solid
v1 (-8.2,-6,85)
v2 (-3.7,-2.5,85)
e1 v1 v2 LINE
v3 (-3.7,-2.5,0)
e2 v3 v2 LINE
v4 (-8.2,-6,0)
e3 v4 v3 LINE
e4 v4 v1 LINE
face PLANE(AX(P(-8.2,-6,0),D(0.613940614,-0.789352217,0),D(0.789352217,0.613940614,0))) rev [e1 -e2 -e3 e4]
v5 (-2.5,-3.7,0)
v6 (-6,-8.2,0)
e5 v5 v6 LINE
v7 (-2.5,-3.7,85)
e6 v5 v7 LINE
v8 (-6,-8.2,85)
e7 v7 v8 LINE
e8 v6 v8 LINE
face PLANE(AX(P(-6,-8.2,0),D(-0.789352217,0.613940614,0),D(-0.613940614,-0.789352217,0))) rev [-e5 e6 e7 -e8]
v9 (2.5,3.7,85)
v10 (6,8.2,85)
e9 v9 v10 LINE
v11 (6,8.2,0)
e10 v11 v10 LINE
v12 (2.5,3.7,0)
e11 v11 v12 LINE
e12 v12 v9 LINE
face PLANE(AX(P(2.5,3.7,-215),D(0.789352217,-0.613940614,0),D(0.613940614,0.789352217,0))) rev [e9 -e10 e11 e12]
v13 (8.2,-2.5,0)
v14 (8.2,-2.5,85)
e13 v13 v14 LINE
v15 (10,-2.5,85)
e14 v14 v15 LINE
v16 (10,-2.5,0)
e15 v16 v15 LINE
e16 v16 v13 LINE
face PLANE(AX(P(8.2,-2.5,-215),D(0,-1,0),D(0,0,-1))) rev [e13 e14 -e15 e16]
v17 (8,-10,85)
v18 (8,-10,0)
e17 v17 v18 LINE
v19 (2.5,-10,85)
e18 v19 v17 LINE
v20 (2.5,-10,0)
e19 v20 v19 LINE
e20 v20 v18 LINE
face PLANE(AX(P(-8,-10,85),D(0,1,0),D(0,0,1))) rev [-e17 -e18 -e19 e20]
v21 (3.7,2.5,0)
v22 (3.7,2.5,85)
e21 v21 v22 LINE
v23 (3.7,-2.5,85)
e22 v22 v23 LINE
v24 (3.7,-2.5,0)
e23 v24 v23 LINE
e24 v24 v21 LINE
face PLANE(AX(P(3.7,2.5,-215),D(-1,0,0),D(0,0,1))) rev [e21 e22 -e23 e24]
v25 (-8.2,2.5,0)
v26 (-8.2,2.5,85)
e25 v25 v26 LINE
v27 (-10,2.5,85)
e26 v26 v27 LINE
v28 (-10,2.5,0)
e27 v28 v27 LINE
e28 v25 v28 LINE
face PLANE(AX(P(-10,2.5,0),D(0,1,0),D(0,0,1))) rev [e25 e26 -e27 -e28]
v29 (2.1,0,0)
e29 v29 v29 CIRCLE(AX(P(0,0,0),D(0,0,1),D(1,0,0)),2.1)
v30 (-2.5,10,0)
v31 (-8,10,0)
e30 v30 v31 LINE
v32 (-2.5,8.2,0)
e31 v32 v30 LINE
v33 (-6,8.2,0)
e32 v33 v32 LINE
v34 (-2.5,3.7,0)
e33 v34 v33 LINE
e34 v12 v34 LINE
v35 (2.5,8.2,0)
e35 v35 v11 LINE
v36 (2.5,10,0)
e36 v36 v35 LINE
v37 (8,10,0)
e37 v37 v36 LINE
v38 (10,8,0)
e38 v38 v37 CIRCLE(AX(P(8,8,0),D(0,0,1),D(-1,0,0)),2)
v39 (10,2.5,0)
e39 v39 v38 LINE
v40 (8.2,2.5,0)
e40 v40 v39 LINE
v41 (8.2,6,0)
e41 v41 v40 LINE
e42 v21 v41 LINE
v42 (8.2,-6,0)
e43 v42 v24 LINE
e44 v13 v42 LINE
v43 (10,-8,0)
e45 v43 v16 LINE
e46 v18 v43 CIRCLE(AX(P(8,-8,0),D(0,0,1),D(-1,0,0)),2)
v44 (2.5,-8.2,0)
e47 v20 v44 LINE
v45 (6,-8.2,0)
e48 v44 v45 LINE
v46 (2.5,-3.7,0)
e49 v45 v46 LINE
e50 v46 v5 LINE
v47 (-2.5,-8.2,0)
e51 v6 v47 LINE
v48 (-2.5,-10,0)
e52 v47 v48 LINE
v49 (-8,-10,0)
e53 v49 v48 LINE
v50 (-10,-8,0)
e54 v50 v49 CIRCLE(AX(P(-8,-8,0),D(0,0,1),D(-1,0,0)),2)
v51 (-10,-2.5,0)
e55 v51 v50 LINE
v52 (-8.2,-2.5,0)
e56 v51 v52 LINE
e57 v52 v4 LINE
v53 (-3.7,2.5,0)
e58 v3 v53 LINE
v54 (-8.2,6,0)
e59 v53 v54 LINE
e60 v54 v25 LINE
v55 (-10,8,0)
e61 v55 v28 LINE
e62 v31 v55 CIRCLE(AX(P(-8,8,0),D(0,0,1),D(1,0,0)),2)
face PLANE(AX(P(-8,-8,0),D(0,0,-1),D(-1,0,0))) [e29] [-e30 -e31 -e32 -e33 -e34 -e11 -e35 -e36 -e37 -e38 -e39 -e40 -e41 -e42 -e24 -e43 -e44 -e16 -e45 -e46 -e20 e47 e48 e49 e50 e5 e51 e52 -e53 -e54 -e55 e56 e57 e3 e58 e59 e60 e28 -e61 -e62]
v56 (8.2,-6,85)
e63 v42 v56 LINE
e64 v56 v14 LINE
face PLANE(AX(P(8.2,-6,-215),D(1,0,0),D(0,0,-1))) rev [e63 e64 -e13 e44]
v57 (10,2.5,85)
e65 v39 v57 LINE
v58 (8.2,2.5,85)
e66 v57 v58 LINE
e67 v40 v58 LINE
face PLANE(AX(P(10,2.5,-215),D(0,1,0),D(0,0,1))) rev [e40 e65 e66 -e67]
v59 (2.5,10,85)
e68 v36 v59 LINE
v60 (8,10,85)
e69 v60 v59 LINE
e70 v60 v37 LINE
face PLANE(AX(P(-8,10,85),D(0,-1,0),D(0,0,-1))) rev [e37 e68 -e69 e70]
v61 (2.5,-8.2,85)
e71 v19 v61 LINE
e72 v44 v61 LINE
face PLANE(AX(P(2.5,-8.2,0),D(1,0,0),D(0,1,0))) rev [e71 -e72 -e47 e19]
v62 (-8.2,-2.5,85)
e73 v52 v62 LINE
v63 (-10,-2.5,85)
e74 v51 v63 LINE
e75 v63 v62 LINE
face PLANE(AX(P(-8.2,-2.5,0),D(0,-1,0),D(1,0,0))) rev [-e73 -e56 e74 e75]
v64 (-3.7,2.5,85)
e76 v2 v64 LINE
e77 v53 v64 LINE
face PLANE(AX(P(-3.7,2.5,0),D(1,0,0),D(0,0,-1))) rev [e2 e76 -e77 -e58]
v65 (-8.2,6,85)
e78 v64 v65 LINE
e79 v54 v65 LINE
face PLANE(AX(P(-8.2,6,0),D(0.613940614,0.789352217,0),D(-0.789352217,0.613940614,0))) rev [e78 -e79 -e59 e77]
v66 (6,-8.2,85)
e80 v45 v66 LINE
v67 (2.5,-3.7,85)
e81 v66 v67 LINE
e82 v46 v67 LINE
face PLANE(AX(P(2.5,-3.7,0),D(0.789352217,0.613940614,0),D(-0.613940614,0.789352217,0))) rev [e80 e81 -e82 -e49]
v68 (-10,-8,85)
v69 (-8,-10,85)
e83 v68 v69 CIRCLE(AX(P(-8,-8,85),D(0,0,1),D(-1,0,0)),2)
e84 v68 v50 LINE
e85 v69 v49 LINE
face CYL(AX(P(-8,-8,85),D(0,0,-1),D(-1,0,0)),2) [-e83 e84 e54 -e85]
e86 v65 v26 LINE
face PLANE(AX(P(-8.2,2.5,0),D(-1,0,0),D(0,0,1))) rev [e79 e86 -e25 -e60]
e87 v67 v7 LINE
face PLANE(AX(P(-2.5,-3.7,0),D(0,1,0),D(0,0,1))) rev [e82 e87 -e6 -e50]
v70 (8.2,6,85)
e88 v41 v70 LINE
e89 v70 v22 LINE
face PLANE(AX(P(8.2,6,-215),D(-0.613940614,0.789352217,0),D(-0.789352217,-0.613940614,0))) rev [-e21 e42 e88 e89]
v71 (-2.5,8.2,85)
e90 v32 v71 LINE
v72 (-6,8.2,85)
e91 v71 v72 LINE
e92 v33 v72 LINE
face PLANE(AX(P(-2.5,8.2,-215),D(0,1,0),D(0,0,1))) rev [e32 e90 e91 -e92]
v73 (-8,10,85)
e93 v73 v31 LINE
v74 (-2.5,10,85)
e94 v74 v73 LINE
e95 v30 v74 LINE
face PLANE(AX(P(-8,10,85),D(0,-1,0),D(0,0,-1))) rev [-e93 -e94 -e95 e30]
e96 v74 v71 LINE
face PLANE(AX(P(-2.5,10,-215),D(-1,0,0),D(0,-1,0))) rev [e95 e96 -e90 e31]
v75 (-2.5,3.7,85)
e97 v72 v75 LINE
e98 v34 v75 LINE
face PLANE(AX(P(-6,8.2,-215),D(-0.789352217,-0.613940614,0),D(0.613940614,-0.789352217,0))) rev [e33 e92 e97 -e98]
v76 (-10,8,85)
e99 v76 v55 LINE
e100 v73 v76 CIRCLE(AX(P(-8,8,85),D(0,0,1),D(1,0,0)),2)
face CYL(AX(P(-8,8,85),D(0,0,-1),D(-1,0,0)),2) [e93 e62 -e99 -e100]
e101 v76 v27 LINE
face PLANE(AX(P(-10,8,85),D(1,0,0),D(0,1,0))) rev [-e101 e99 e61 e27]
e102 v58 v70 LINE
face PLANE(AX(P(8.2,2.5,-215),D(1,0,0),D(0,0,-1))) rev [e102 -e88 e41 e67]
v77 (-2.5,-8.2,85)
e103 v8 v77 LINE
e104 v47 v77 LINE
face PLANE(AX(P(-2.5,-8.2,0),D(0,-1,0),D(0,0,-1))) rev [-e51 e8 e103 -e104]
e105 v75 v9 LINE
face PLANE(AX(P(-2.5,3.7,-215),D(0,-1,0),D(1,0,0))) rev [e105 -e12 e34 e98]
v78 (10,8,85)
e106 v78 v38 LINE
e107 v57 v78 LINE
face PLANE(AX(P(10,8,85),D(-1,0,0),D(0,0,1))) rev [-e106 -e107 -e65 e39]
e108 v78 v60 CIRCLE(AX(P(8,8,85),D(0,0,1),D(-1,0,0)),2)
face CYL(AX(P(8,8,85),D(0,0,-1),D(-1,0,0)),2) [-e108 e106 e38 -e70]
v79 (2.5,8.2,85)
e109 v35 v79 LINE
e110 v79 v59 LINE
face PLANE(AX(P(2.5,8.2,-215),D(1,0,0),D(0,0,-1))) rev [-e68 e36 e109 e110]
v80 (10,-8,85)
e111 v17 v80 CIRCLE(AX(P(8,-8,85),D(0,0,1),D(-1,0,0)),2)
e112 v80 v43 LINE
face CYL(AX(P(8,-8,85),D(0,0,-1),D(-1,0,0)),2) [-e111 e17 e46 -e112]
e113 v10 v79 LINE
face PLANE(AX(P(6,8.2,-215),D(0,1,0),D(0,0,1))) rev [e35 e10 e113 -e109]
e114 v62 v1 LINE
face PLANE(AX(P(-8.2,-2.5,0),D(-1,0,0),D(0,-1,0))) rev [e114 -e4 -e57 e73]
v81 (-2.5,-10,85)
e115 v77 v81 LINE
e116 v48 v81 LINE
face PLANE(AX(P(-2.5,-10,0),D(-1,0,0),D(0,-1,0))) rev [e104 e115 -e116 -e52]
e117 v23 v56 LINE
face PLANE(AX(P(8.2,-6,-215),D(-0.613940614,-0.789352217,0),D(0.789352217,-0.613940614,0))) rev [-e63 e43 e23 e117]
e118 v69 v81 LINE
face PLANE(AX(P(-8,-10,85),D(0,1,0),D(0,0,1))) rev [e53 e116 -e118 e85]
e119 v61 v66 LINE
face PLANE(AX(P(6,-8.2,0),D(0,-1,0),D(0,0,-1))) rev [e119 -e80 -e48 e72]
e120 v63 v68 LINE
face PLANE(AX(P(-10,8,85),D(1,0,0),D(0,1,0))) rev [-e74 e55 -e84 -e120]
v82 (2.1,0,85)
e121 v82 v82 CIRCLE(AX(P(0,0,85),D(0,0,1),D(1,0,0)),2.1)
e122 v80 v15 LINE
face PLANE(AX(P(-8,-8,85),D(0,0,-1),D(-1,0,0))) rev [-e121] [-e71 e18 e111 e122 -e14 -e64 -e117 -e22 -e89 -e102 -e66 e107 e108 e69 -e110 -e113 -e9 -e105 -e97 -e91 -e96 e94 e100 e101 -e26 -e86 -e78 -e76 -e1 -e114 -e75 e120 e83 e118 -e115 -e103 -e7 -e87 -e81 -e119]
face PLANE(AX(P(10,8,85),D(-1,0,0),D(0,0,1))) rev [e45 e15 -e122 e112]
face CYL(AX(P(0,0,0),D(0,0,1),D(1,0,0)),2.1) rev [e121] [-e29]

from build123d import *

# Parameters (mm, degrees)
EXTRUSION1_DEPTH        = 85
PER_AGE1_OUTLINE_R      = 2.1
PER_AGE1_DEPTH          = 85
ENL_V_MAT_EXTRU_1_DEPTH = 300
ENL_V_MAT_EXTRU_3_DEPTH = 300
ENL_V_MAT_EXTRU_4_DEPTH = 87.168439698
ENL_V_MAT_EXTRU_7_DEPTH = 87.168439698


# Read off the part's stored shape, not the designer's step: Perçage1
with BuildPart() as part:
    # Esquisse1 → Extrusion1 (new body)
    with BuildSketch(Plane.XY):
        with BuildLine():
            Line((-10, 8), (-10, -8))
            ThreePointArc((-10, -8), (-9.414213562, -9.414213562), (-8, -10))
            Line((-8, -10), (8, -10))
            ThreePointArc((8, -10), (9.414213562, -9.414213562), (10, -8))
            Line((10, -8), (10, 8))
            ThreePointArc((10, 8), (9.414213562, 9.414213562), (8, 10))
            Line((8, 10), (-8, 10))
            ThreePointArc((-8, 10), (-9.414213562, 9.414213562), (-10, 8))
        make_face()
    extrude(amount=EXTRUSION1_DEPTH)

    # Perçage1 outline → Perçage1 (cut)
    with BuildSketch(Plane.XY):
        Circle(PER_AGE1_OUTLINE_R)
    extrude(amount=PER_AGE1_DEPTH, mode=Mode.SUBTRACT)

    # Esquisse3 → Enlèv. mat.-Extru.1 (cut)
    with BuildSketch(Plane.XY.offset(85)):
        Polygon((10, 2.5), (8.2, 2.5), (8.2, 6), (3.7, 2.5), (3.7, -2.5), (8.2, -6), (8.2, -2.5), (10, -2.5), align=None)
    extrude(amount=-ENL_V_MAT_EXTRU_1_DEPTH, mode=Mode.SUBTRACT)

    # Esquisse5 → Enlèv. mat.-Extru.3 (cut)
    with BuildSketch(Plane.XY.offset(85)):
        Polygon((-2.5, 10), (-2.5, 8.2), (-6, 8.2), (-2.5, 3.7), (2.5, 3.7), (6, 8.2), (2.5, 8.2), (2.5, 10), align=None)
    extrude(amount=-ENL_V_MAT_EXTRU_3_DEPTH, mode=Mode.SUBTRACT)

    # Esquisse6 → Enlèv. mat.-Extru.4 (cut, through all)
    with BuildSketch(Plane.XY.offset(85)):
        Polygon((-2.5, -10), (-2.5, -8.2), (-6, -8.2), (-2.5, -3.7), (2.5, -3.7), (6, -8.2), (2.5, -8.2), (2.5, -10), align=None)
    extrude(amount=-ENL_V_MAT_EXTRU_4_DEPTH, mode=Mode.SUBTRACT)

    # Esquisse4 → Enlèv. mat.-Extru.7 (cut, through all)
    with BuildSketch(Plane.XY.offset(85)):
        Polygon((-10, 2.5), (-8.2, 2.5), (-8.2, 6), (-3.7, 2.5), (-3.7, -2.5), (-8.2, -6), (-8.2, -2.5), (-10, -2.5), align=None)
    extrude(amount=-ENL_V_MAT_EXTRU_7_DEPTH, mode=Mode.SUBTRACT)


solid = part.part
